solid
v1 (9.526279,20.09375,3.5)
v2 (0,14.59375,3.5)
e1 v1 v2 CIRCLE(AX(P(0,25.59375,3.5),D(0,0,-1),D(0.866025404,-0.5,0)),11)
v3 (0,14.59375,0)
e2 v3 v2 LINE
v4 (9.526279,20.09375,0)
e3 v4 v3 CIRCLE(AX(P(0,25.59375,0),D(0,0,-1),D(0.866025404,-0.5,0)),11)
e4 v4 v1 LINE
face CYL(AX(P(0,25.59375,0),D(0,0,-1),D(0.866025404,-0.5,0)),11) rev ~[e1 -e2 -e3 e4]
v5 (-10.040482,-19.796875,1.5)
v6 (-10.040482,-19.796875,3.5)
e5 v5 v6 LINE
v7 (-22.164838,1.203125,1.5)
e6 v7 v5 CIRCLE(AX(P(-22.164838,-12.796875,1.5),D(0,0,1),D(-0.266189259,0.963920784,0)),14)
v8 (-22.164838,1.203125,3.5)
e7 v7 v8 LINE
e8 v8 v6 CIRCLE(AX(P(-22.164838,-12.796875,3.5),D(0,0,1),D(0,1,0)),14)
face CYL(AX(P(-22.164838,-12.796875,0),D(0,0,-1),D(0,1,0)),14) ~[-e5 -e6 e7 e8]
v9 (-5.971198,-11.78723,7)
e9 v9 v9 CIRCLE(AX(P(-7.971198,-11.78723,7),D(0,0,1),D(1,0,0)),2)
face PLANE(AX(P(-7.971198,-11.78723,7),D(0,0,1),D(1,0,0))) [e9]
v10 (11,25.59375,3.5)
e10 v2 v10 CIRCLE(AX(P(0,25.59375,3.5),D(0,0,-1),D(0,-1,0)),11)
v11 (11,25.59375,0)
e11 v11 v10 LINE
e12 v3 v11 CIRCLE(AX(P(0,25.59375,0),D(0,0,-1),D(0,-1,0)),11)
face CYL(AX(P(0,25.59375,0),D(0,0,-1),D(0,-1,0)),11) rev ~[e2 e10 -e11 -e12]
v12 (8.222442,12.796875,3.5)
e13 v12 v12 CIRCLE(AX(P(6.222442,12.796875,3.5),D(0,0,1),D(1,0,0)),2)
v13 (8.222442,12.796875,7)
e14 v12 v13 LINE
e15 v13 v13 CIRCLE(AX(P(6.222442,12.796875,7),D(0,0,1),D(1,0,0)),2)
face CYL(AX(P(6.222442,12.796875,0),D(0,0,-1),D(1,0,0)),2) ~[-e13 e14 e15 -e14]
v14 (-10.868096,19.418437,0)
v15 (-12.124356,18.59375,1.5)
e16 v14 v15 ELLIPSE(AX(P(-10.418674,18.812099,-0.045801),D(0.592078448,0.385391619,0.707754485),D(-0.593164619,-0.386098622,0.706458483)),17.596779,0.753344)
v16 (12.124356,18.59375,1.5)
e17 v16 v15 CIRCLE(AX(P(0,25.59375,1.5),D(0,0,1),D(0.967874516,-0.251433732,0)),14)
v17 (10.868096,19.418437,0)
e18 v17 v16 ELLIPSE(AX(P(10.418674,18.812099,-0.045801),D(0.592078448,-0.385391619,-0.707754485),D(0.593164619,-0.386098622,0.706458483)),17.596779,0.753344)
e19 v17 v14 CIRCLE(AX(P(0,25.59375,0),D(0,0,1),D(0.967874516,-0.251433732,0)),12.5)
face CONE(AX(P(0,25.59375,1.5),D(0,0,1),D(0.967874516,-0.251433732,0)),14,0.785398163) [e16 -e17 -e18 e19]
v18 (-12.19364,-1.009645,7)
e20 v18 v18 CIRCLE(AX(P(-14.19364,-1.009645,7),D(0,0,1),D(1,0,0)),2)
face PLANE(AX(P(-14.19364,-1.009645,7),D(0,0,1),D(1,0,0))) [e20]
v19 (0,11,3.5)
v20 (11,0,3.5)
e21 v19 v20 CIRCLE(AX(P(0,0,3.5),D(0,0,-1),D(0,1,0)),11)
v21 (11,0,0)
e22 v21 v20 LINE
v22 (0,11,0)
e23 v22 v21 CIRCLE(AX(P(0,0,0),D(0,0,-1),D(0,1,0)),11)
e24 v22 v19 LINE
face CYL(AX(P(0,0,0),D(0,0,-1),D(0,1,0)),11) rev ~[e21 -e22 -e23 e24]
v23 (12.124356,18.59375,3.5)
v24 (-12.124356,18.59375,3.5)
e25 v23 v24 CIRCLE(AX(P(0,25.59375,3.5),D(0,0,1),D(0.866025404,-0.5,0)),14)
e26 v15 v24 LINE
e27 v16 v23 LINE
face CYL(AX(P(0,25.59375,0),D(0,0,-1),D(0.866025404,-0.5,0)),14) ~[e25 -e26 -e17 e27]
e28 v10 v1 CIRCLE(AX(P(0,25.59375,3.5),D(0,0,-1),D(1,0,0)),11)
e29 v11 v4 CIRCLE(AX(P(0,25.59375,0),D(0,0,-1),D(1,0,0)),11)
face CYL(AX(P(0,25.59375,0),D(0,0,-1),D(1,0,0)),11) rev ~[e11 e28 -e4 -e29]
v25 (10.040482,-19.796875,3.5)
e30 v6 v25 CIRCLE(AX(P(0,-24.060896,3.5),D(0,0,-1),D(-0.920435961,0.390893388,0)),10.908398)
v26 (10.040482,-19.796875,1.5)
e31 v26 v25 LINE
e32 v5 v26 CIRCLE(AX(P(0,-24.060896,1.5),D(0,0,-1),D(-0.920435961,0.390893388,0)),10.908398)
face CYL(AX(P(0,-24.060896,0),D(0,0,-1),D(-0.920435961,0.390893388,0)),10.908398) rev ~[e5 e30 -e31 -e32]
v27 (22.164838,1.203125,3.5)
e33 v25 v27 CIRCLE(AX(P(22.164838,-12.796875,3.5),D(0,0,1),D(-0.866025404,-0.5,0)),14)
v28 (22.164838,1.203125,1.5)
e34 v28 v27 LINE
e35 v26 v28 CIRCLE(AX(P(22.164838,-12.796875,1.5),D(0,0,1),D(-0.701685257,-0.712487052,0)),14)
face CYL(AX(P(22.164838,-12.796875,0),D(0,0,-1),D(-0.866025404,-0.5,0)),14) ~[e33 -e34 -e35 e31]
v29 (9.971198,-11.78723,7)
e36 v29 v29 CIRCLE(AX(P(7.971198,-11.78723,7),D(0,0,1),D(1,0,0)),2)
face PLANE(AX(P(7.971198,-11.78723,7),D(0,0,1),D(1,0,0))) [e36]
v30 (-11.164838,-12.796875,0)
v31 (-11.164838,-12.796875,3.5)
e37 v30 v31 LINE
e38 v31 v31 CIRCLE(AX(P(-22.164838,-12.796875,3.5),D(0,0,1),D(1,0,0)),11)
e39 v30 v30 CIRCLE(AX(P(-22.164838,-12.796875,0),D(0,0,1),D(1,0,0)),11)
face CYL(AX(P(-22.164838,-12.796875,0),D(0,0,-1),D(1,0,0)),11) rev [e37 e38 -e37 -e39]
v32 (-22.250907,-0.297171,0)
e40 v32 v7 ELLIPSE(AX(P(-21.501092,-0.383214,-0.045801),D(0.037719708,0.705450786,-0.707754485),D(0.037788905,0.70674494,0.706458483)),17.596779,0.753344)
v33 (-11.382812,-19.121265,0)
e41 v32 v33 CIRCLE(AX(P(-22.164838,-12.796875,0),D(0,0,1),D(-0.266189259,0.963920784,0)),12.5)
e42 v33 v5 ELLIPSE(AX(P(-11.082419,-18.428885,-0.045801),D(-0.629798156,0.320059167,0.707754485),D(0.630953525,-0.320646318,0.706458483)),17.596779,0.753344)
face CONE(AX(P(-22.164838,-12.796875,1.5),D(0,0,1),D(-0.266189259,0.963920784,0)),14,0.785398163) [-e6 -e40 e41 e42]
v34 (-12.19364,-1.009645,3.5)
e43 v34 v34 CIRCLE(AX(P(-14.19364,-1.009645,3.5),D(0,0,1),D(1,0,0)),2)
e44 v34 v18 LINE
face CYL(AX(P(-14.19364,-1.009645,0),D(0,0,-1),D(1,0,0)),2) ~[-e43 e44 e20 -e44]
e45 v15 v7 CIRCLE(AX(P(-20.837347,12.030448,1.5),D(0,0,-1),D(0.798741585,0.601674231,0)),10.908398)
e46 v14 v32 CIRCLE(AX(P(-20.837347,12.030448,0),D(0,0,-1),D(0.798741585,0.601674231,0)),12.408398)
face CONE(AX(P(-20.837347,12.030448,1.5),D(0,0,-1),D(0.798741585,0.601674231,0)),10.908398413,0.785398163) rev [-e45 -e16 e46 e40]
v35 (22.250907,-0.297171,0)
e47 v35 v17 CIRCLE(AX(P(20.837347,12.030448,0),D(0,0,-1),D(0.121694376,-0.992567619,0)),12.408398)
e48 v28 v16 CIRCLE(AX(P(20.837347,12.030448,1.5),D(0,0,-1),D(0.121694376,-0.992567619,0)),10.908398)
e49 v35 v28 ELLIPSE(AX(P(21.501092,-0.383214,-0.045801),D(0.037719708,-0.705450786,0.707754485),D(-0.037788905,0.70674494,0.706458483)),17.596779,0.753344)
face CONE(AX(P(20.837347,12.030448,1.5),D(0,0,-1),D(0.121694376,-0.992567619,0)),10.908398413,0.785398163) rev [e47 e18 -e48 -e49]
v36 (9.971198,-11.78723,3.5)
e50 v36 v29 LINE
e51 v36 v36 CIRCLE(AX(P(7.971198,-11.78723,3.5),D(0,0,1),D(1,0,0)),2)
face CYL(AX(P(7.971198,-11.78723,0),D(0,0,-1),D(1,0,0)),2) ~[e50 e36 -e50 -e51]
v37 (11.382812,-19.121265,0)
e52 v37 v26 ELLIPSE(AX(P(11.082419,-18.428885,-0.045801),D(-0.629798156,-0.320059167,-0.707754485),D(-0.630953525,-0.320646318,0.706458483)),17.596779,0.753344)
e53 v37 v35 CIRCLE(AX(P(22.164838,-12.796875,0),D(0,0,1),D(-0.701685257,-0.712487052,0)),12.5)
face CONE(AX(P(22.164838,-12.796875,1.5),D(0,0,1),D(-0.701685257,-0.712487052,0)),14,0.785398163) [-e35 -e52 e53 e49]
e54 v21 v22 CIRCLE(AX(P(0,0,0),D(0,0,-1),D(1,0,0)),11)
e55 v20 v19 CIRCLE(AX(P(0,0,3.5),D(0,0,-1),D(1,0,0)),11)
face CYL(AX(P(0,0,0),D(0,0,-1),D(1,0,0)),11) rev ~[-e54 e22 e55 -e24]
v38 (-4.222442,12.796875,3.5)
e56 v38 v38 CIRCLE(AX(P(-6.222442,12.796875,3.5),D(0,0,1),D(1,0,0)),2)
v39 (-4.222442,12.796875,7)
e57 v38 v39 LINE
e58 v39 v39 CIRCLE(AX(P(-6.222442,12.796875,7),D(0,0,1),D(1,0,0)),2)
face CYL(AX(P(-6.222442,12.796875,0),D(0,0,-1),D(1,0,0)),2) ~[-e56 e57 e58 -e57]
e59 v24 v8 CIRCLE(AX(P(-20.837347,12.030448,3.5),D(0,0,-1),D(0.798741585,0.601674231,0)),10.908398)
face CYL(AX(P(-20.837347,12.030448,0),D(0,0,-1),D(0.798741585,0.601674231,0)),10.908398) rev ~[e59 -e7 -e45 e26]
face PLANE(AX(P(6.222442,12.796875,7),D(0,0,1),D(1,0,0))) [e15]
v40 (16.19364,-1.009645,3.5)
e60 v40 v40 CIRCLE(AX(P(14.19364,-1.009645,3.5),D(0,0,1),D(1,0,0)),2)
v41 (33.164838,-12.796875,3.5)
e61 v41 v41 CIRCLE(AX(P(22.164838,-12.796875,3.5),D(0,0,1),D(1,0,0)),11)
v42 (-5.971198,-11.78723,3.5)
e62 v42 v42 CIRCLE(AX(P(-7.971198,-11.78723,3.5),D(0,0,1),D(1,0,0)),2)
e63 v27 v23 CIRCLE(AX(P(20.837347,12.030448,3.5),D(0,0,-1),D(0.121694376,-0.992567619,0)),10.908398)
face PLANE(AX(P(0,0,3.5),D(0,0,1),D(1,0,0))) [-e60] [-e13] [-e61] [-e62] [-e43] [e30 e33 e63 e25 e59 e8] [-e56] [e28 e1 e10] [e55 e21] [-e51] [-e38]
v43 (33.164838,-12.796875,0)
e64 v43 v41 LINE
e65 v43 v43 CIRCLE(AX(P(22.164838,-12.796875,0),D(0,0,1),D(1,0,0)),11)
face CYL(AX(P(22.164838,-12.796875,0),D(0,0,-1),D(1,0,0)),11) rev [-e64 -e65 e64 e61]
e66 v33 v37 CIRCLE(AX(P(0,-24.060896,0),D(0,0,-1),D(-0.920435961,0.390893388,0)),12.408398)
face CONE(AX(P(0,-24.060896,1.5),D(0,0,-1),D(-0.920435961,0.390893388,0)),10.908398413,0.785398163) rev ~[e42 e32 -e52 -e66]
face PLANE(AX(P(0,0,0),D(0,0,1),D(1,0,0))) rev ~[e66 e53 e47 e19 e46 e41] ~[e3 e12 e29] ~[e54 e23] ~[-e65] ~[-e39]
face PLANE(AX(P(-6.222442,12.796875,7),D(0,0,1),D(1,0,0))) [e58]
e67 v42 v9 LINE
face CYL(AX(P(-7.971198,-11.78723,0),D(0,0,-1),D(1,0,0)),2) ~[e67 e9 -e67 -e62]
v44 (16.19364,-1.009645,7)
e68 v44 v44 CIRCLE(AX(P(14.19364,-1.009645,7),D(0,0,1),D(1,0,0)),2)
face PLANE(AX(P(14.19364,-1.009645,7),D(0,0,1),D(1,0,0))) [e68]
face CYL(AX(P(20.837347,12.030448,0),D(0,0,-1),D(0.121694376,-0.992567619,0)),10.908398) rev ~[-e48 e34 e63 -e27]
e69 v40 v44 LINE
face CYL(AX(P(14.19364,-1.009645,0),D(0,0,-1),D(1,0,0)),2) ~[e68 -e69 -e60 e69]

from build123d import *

# Parameters (mm, degrees)
F0_R       = 11
F0_R_2     = 2
F1_DEPTH   = 3.5
F2_DEPTH   = 7
F3_C1_SIZE = 1.5
F3_C2_SIZE = 1.5
F3_C3_SIZE = 1.5
F3_C4_SIZE = 1.5
F3_C5_SIZE = 1.5
F3_C6_SIZE = 1.5


with BuildPart() as f1:
    # F0 (on Top) → F1 (new body)
    with BuildSketch(Plane.XY):
        with BuildLine():
            ThreePointArc((22.164837833, 1.2031249106), (11.390396953, 6.576248747), (12.124355653, 18.5937501788))
            ThreePointArc((12.124355653, 18.5937501788), (0, 39.5937501788), (-12.124355653, 18.5937501788))
            ThreePointArc((-12.124355653, 18.5937501788), (-11.390396953, 6.576248747), (-22.164837833, 1.2031249106))
            ThreePointArc((-22.164837833, 1.2031249106), (-34.2891934859, -19.7968750894), (-10.04048218, -19.7968750894))
            ThreePointArc((-10.04048218, -19.7968750894), (0, -13.152497494), (10.04048218, -19.7968750894))
            ThreePointArc((10.04048218, -19.7968750894), (34.2891934859, -19.7968750894), (22.164837833, 1.2031249106))
        make_face()
        with Locations((-22.164837833, -12.7968750894)):
            Circle(F0_R, mode=Mode.SUBTRACT)
        with Locations((-7.9711980778, -11.7872301109)):
            Circle(F0_R_2, mode=Mode.SUBTRACT)
        with Locations((-14.1936397552, -1.0096449785)):
            Circle(F0_R_2, mode=Mode.SUBTRACT)
        with Locations((7.9711980778, -11.7872301109)):
            Circle(F0_R_2, mode=Mode.SUBTRACT)
        with Locations((22.164837833, -12.7968750894)):
            Circle(F0_R, mode=Mode.SUBTRACT)
        with BuildLine():
            ThreePointArc((0, 11), (7.7781745931, 7.7781745931), (11, 0))
            ThreePointArc((11, 0), (-7.7781745931, -7.7781745931), (0, 11))
        make_face(mode=Mode.SUBTRACT)
        with Locations((14.1936397552, -1.0096449785)):
            Circle(F0_R_2, mode=Mode.SUBTRACT)
        with Locations((-6.2224416774, 12.7968750894)):
            Circle(F0_R_2, mode=Mode.SUBTRACT)
        with Locations((6.2224416774, 12.7968750894)):
            Circle(F0_R_2, mode=Mode.SUBTRACT)
        with BuildLine():
            ThreePointArc((9.5262794416, 20.0937501788), (5.5, 16.0674707372), (0, 14.5937501788))
            ThreePointArc((0, 14.5937501788), (-5.5, 16.0674707372), (-9.5262794416, 20.0937501788))
            ThreePointArc((-9.5262794416, 20.0937501788), (-2.8470094961, 36.218934268), (11, 25.5937501788))
            ThreePointArc((11, 25.5937501788), (10.6251840892, 22.7467406827), (9.5262794416, 20.0937501788))
        make_face(mode=Mode.SUBTRACT)
    extrude(amount=F1_DEPTH)

    # F0 (on Top) → F2 (join)
    with BuildSketch(Plane.XY):
        with Locations((-6.2224416774, 12.7968750894)):
            Circle(F0_R_2)
        with Locations((6.2224416774, 12.7968750894)):
            Circle(F0_R_2)
        with Locations((14.1936397552, -1.0096449785)):
            Circle(F0_R_2)
        with Locations((7.9711980778, -11.7872301109)):
            Circle(F0_R_2)
        with Locations((-7.9711980778, -11.7872301109)):
            Circle(F0_R_2)
        with Locations((-14.1936397552, -1.0096449785)):
            Circle(F0_R_2)
    extrude(amount=F2_DEPTH)

    # F3: chamfer of 1.5 on 6 edges, made by hand

    # F3_c1
    f3_c1_edges = [f1.edges().sort_by_distance(p)[0] for p in [
        (0, -13.152497494, 0),
    ]]
    chamfer(f3_c1_edges, length=F3_C1_SIZE)

    # F3_c2
    f3_c2_edges = [f1.edges().sort_by_distance(p)[0] for p in [
        (11.390396953, 6.576248747, 0),
    ]]
    chamfer(f3_c2_edges, length=F3_C2_SIZE)

    # F3_c3
    f3_c3_edges = [f1.edges().sort_by_distance(p)[0] for p in [
        (-11.390396953, 6.576248747, 0),
    ]]
    chamfer(f3_c3_edges, length=F3_C3_SIZE)

    # F3_c4
    f3_c4_edges = [f1.edges().sort_by_distance(p)[0] for p in [
        (-34.2891934859, -19.7968750894, 0),
    ]]
    chamfer(f3_c4_edges, length=F3_C4_SIZE)

    # F3_c5
    f3_c5_edges = [f1.edges().sort_by_distance(p)[0] for p in [
        (34.2891934859, -19.7968750894, 0),
    ]]
    chamfer(f3_c5_edges, length=F3_C5_SIZE)

    # F3_c6
    f3_c6_edges = [f1.edges().sort_by_distance(p)[0] for p in [
        (0, 39.5937501788, 0),
    ]]
    chamfer(f3_c6_edges, length=F3_C6_SIZE)


solid = f1.part
